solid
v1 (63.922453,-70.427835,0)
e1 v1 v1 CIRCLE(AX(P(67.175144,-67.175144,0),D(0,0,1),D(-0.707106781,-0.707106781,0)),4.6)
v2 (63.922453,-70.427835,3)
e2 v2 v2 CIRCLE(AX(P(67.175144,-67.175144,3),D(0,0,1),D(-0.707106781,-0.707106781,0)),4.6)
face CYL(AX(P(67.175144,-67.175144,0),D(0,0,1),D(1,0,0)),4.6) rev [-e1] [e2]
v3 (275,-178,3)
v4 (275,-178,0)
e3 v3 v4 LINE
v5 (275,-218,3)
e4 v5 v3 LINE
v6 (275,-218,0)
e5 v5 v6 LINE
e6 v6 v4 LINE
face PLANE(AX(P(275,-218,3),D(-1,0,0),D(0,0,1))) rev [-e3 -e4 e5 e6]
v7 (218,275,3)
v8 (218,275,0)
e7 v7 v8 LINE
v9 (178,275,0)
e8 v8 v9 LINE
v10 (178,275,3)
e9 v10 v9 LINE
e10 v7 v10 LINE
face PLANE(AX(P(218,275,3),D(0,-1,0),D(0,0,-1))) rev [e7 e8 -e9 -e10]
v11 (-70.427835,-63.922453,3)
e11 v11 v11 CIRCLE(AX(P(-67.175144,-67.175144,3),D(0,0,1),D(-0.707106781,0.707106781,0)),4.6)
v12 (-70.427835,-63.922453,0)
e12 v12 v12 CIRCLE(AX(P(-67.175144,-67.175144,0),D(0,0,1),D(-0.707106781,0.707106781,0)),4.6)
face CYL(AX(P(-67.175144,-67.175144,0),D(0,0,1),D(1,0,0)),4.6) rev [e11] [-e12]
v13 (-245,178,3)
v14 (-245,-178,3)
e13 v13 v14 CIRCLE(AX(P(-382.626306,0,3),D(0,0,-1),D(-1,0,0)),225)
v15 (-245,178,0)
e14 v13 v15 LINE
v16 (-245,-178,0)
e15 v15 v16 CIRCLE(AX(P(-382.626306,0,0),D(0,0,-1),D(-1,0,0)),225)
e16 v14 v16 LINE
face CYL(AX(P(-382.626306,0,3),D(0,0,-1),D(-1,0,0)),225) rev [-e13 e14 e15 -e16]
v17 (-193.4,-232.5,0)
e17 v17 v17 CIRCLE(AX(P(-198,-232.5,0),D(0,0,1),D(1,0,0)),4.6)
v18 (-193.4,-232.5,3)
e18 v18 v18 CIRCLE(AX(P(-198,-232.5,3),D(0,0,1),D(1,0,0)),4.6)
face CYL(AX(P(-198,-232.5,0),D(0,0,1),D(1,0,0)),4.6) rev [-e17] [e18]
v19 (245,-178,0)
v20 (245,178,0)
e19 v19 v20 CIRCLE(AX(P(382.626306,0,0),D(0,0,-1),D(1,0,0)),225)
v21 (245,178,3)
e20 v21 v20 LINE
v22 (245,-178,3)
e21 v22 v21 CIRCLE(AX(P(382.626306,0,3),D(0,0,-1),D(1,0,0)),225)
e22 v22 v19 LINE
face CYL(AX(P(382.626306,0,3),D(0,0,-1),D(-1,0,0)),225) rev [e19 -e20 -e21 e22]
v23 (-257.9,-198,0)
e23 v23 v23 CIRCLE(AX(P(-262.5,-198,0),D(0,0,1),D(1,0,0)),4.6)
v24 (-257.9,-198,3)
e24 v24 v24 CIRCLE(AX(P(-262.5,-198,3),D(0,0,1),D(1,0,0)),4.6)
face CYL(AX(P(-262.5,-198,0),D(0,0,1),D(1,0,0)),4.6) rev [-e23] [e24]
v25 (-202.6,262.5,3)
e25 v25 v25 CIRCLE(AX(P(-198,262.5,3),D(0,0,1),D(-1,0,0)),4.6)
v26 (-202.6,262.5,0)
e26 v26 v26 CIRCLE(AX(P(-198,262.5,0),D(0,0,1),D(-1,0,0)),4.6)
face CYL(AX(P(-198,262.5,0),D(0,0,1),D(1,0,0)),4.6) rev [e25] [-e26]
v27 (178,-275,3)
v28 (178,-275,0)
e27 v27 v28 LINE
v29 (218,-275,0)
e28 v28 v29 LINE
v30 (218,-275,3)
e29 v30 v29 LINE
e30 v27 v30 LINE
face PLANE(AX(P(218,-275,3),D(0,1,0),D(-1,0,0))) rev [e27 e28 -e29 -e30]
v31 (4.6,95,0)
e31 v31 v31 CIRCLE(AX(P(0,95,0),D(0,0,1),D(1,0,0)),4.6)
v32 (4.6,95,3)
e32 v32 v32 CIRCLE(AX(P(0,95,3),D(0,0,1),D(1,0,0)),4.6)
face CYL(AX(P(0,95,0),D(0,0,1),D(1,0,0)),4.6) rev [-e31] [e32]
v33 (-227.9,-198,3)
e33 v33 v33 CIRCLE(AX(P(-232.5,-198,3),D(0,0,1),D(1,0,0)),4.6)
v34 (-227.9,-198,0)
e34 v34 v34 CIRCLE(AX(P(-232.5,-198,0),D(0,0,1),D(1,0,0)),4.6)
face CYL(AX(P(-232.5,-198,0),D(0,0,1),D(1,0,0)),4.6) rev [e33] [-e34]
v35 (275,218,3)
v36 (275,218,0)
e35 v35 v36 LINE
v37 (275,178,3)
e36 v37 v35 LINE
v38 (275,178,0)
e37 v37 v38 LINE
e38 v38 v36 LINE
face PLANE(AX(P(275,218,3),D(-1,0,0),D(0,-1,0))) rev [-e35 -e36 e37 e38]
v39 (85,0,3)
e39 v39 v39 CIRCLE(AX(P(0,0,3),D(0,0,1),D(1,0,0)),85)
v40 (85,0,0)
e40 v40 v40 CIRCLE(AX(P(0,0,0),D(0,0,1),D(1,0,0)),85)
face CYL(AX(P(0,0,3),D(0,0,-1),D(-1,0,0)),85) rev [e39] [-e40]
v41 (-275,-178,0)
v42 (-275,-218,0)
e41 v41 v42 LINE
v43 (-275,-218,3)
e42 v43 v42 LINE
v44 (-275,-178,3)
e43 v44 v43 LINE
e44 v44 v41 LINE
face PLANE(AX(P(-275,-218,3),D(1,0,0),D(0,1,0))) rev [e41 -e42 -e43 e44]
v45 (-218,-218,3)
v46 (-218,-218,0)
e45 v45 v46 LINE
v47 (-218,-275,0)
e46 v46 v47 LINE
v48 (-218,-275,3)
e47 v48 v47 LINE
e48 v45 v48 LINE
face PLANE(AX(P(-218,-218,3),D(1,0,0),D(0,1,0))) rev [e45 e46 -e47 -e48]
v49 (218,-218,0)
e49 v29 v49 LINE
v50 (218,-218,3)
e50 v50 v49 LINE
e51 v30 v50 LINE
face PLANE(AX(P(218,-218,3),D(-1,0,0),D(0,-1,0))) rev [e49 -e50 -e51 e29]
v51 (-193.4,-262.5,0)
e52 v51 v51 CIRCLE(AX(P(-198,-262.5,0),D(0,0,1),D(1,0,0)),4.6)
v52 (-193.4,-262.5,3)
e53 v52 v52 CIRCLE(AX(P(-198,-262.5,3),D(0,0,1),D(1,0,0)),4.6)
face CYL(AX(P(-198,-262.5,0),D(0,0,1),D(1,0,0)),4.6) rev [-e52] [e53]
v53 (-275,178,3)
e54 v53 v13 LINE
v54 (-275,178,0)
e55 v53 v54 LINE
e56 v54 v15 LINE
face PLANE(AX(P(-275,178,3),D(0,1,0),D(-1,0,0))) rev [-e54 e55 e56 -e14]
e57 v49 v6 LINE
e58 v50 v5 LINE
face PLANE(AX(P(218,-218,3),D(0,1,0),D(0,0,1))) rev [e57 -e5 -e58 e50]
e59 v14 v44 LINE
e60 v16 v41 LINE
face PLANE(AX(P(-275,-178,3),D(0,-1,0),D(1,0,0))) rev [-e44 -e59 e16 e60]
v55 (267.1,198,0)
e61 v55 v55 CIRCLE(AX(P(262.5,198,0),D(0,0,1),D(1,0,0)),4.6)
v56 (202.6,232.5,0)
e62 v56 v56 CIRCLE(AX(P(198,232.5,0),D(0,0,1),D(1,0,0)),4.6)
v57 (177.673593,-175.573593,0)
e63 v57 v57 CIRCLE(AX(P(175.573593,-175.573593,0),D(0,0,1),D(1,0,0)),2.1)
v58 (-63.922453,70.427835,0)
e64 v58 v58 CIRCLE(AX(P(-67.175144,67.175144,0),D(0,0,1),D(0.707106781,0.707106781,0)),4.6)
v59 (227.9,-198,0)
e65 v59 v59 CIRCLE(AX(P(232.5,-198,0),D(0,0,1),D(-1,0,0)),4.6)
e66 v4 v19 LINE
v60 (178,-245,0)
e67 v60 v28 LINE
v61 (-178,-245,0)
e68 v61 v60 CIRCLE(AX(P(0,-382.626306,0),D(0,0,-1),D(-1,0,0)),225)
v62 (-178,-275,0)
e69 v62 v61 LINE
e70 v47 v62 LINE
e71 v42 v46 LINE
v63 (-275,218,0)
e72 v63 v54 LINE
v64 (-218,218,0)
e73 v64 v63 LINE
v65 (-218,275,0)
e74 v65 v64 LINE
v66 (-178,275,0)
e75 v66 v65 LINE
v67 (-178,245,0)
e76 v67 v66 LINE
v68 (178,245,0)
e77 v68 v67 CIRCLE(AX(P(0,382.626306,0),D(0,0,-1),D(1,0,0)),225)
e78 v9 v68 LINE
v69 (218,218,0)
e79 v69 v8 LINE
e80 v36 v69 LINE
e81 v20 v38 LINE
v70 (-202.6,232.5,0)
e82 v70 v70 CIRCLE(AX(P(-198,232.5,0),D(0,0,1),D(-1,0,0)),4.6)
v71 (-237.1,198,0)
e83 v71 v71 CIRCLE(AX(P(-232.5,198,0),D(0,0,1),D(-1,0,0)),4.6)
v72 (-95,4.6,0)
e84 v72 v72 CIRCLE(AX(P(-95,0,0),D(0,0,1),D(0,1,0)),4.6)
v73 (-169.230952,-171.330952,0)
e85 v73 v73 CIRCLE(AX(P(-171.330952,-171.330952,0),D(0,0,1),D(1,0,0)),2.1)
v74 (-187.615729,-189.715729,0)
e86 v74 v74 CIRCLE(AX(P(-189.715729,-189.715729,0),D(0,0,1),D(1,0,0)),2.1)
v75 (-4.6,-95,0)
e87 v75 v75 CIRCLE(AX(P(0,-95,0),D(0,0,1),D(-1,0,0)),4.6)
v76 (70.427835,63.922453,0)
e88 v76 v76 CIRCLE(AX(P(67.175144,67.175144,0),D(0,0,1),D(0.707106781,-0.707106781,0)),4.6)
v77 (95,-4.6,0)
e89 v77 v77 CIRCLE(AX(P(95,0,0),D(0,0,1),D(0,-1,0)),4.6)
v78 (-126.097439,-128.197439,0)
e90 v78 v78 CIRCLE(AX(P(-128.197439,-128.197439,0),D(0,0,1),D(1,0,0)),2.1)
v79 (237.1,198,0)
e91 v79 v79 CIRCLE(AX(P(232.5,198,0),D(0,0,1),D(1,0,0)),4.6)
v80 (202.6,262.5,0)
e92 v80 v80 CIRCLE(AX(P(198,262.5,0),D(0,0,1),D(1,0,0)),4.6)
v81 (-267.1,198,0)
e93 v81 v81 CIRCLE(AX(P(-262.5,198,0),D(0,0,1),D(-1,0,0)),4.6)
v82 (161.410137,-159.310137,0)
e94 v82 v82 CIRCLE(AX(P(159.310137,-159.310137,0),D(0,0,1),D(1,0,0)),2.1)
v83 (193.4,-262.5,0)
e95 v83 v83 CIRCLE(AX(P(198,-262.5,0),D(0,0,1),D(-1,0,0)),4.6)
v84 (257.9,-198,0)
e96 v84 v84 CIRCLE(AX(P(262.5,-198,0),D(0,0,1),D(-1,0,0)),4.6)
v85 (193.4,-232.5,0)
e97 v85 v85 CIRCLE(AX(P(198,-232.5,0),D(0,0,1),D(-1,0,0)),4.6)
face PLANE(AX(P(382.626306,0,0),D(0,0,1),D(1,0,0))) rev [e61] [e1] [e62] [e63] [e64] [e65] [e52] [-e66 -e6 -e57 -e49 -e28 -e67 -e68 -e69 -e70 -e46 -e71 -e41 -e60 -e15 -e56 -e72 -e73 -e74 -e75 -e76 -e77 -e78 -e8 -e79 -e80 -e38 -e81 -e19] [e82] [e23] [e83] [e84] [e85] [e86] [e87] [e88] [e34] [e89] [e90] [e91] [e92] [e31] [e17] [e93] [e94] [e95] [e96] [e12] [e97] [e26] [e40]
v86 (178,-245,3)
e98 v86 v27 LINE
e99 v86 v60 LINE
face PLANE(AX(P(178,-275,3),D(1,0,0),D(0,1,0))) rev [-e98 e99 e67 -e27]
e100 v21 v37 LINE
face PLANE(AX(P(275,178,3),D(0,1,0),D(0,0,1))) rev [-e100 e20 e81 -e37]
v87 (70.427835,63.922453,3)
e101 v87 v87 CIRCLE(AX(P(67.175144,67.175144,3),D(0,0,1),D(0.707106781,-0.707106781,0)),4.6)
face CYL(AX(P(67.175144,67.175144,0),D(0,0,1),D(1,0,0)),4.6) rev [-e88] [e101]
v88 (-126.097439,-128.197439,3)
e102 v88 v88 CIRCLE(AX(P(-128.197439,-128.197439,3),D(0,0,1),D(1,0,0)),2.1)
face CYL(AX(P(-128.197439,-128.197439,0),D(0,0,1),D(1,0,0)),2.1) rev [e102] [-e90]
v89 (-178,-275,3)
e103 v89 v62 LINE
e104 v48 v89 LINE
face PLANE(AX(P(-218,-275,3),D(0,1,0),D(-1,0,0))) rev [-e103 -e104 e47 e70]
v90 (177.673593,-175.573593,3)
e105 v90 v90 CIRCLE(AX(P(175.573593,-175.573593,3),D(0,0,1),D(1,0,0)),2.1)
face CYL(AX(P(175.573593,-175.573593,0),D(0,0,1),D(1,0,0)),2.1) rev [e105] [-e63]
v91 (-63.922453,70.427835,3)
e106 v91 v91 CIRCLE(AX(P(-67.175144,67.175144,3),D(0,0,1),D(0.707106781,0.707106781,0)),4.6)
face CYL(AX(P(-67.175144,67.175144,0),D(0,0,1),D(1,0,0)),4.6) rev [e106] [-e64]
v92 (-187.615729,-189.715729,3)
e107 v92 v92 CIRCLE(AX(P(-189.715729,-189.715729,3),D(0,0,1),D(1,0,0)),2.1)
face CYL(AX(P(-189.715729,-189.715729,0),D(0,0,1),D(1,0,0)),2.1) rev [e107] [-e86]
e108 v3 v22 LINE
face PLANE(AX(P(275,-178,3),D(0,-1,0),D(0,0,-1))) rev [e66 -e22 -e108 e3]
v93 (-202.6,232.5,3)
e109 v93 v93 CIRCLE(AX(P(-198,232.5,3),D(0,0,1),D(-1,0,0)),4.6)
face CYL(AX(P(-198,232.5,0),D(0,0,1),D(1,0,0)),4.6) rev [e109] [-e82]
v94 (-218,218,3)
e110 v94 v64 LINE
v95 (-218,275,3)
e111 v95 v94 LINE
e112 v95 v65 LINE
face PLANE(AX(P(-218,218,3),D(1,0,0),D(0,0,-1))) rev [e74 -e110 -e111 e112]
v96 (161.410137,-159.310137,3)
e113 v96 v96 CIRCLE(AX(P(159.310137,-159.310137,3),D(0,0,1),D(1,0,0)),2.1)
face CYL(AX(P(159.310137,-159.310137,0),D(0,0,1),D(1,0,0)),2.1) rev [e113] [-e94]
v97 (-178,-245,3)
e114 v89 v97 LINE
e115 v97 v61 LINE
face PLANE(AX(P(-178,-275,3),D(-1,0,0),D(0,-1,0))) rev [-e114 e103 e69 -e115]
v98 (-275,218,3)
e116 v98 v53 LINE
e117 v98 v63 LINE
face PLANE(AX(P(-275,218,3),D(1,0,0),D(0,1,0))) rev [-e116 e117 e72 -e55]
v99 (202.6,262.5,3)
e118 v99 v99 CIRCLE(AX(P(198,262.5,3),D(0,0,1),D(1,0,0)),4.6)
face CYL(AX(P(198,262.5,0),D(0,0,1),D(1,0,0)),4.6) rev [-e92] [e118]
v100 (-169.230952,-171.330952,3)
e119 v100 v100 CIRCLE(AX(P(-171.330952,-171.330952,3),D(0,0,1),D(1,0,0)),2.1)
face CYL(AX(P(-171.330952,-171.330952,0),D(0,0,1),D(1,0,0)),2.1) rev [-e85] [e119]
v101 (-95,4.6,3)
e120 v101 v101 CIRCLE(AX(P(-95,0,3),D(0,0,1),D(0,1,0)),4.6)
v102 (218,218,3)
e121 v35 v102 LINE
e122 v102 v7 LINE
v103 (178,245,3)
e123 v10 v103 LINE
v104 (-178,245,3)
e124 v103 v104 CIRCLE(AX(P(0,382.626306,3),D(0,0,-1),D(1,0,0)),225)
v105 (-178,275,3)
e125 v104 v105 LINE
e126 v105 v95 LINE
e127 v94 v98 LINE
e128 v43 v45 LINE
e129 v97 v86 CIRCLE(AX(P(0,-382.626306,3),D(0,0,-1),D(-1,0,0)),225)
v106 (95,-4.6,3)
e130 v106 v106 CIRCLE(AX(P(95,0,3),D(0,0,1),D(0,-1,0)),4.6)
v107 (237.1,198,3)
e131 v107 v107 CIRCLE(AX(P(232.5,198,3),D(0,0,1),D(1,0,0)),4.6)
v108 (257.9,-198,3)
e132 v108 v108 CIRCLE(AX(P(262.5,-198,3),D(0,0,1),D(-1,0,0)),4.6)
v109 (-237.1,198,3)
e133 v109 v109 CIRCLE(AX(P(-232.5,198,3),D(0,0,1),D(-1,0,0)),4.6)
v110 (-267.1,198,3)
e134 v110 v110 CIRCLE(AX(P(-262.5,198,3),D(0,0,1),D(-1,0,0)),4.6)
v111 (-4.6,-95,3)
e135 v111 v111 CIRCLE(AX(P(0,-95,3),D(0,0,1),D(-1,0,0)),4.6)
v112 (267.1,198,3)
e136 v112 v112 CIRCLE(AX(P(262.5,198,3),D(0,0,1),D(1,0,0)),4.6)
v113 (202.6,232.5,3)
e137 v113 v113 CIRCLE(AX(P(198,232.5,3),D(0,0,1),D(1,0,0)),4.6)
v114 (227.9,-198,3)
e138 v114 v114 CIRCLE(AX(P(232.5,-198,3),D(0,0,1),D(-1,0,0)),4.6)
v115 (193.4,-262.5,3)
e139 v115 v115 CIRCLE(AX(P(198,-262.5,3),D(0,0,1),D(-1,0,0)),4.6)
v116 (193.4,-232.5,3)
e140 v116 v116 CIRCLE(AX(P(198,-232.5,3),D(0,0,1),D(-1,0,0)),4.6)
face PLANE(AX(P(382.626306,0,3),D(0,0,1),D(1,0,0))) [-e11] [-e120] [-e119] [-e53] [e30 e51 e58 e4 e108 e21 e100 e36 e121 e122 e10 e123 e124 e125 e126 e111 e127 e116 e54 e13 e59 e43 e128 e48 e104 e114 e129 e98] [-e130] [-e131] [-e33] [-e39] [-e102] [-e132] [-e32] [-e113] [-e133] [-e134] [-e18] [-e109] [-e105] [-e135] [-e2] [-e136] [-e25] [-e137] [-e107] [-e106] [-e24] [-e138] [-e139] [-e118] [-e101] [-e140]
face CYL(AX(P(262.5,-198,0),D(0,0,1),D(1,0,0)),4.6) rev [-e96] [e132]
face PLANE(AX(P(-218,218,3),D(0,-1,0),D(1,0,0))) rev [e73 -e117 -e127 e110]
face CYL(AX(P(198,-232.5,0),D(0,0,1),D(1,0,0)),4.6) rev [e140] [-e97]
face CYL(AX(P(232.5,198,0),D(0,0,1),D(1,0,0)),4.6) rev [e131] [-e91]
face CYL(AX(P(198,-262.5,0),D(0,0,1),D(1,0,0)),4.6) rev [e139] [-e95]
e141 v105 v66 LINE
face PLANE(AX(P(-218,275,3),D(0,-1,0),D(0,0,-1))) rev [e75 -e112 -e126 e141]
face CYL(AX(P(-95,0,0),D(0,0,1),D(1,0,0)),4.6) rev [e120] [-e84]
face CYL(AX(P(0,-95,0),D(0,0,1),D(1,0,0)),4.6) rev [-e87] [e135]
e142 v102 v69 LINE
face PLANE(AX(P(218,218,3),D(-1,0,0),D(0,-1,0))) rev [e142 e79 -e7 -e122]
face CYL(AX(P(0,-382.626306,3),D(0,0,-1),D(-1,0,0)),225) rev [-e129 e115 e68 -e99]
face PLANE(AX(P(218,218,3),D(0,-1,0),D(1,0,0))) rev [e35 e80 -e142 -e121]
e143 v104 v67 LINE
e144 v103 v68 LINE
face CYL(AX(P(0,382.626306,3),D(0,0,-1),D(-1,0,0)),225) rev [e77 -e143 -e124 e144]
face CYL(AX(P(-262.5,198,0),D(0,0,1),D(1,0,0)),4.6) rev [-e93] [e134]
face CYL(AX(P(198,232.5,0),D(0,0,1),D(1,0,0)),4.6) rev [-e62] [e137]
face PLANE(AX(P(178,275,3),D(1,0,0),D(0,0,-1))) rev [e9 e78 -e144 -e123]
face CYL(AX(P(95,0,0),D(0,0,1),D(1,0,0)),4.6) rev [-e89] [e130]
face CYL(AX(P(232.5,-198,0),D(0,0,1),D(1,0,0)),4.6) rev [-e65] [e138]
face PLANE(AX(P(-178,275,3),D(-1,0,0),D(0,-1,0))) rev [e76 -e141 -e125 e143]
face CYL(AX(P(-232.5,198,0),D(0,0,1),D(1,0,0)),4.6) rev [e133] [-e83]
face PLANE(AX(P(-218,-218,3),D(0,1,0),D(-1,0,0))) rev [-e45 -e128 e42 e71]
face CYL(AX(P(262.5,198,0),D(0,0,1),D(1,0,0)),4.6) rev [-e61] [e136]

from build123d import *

# Parameters (mm, degrees)
SKETCH1_R          = 85
BASE_FLANGE1_DEPTH = 3
SKETCH2_R          = 4.6
EXTRUDE1_DEPTH     = 3
SKETCH3_R          = 4.6
EXTRUDE2_DEPTH     = 3
CIRPATTERN1_COUNT  = 8
SKETCH4_R          = 2.1
CUT_EXTRUDE1_DEPTH = 10


# Sheet-metal steps are written as plain solids
with BuildPart() as part:
    # Sketch1 → Base-Flange1 (new body)
    with BuildSketch(Plane.XY):
        with BuildLine():
            Line((218, 218), (218, 275))
            Line((218, 275), (178, 275))
            Line((178, 275), (178, 245))
            ThreePointArc((178, 245), (0, 157.626305625), (-178, 245))
            Line((-178, 245), (-178, 275))
            Line((-178, 275), (-218, 275))
            Line((-218, 275), (-218, 218))
            Line((-218, 218), (-275, 218))
            Line((-275, 218), (-275, 178))
            Line((-275, 178), (-245, 178))
            ThreePointArc((-245, 178), (-157.626305625, 0), (-245, -178))
            Line((-245, -178), (-275, -178))
            Line((-275, -178), (-275, -218))
            Line((-275, -218), (-218, -218))
            Line((-218, -218), (-218, -275))
            Line((-218, -275), (-178, -275))
            Line((-178, -275), (-178, -245))
            ThreePointArc((-178, -245), (0, -157.626305625), (178, -245))
            Line((178, -245), (178, -275))
            Line((178, -275), (218, -275))
            Line((218, -275), (218, -218))
            Line((218, -218), (275, -218))
            Line((275, -218), (275, -178))
            Line((275, -178), (245, -178))
            ThreePointArc((245, -178), (157.626305625, 0), (245, 178))
            Line((245, 178), (275, 178))
            Line((275, 178), (275, 218))
            Line((275, 218), (218, 218))
        make_face()
        Circle(SKETCH1_R, mode=Mode.SUBTRACT)
    extrude(amount=BASE_FLANGE1_DEPTH)

    # Sketch2 → Extrude1 (cut)
    with BuildSketch(Plane.XY.offset(3)):
        with Locations((198, 262.5)):
            Circle(SKETCH2_R)
        with Locations((198, 232.5)):
            Circle(SKETCH2_R)
        with Locations((232.5, 198)):
            Circle(SKETCH2_R)
        with Locations((262.5, 198)):
            Circle(SKETCH2_R)
        with Locations(Location((262.5, -198, 0), (0, 0, 180))):
            Circle(SKETCH2_R)
        with Locations(Location((232.5, -198, 0), (0, 0, 180))):
            Circle(SKETCH2_R)
        with Locations(Location((198, -232.5, 0), (0, 0, 180))):
            Circle(SKETCH2_R)
        with Locations(Location((198, -262.5, 0), (0, 0, 180))):
            Circle(SKETCH2_R)
        with Locations((-198, -262.5)):
            Circle(SKETCH2_R)
        with Locations((-198, -232.5)):
            Circle(SKETCH2_R)
        with Locations((-232.5, -198)):
            Circle(SKETCH2_R)
        with Locations((-262.5, -198)):
            Circle(SKETCH2_R)
        with Locations(Location((-262.5, 198, 0), (0, 0, 180))):
            Circle(SKETCH2_R)
        with Locations(Location((-232.5, 198, 0), (0, 0, 180))):
            Circle(SKETCH2_R)
        with Locations(Location((-198, 232.5, 0), (0, 0, 180))):
            Circle(SKETCH2_R)
        with Locations(Location((-198, 262.5, 0), (0, 0, 180))):
            Circle(SKETCH2_R)
    extrude(amount=-EXTRUDE1_DEPTH, mode=Mode.SUBTRACT)

    # Sketch3 → Extrude2 (cut)
    with BuildSketch(Plane.XY.offset(3)):
        with Locations((0, 95)):
            Circle(SKETCH3_R)
    extrude2 = extrude(amount=-EXTRUDE2_DEPTH, mode=Mode.SUBTRACT)

    # CirPattern1: Extrude2 ×8 about axis
    cirpattern1_axis = Axis((0, 0, 0), (0, 0, 1))
    for i in range(1, CIRPATTERN1_COUNT):
        add(extrude2.rotate(cirpattern1_axis, i * 360 / CIRPATTERN1_COUNT), mode=Mode.SUBTRACT)

    # Sketch4 → Cut-Extrude1 (cut)
    with BuildSketch(Plane.XY.offset(3)):
        with Locations((-189.715728753, -189.715728753)):
            Circle(SKETCH4_R)
        with Locations((-171.330952442, -171.330952442)):
            Circle(SKETCH4_R)
        with Locations((-128.197438789, -128.197438789)):
            Circle(SKETCH4_R)
        with Locations((175.573593129, -175.573593129)):
            Circle(SKETCH4_R)
        with Locations((159.310137162, -159.310137162)):
            Circle(SKETCH4_R)
    extrude(amount=-CUT_EXTRUDE1_DEPTH, mode=Mode.SUBTRACT)


solid = part.part
